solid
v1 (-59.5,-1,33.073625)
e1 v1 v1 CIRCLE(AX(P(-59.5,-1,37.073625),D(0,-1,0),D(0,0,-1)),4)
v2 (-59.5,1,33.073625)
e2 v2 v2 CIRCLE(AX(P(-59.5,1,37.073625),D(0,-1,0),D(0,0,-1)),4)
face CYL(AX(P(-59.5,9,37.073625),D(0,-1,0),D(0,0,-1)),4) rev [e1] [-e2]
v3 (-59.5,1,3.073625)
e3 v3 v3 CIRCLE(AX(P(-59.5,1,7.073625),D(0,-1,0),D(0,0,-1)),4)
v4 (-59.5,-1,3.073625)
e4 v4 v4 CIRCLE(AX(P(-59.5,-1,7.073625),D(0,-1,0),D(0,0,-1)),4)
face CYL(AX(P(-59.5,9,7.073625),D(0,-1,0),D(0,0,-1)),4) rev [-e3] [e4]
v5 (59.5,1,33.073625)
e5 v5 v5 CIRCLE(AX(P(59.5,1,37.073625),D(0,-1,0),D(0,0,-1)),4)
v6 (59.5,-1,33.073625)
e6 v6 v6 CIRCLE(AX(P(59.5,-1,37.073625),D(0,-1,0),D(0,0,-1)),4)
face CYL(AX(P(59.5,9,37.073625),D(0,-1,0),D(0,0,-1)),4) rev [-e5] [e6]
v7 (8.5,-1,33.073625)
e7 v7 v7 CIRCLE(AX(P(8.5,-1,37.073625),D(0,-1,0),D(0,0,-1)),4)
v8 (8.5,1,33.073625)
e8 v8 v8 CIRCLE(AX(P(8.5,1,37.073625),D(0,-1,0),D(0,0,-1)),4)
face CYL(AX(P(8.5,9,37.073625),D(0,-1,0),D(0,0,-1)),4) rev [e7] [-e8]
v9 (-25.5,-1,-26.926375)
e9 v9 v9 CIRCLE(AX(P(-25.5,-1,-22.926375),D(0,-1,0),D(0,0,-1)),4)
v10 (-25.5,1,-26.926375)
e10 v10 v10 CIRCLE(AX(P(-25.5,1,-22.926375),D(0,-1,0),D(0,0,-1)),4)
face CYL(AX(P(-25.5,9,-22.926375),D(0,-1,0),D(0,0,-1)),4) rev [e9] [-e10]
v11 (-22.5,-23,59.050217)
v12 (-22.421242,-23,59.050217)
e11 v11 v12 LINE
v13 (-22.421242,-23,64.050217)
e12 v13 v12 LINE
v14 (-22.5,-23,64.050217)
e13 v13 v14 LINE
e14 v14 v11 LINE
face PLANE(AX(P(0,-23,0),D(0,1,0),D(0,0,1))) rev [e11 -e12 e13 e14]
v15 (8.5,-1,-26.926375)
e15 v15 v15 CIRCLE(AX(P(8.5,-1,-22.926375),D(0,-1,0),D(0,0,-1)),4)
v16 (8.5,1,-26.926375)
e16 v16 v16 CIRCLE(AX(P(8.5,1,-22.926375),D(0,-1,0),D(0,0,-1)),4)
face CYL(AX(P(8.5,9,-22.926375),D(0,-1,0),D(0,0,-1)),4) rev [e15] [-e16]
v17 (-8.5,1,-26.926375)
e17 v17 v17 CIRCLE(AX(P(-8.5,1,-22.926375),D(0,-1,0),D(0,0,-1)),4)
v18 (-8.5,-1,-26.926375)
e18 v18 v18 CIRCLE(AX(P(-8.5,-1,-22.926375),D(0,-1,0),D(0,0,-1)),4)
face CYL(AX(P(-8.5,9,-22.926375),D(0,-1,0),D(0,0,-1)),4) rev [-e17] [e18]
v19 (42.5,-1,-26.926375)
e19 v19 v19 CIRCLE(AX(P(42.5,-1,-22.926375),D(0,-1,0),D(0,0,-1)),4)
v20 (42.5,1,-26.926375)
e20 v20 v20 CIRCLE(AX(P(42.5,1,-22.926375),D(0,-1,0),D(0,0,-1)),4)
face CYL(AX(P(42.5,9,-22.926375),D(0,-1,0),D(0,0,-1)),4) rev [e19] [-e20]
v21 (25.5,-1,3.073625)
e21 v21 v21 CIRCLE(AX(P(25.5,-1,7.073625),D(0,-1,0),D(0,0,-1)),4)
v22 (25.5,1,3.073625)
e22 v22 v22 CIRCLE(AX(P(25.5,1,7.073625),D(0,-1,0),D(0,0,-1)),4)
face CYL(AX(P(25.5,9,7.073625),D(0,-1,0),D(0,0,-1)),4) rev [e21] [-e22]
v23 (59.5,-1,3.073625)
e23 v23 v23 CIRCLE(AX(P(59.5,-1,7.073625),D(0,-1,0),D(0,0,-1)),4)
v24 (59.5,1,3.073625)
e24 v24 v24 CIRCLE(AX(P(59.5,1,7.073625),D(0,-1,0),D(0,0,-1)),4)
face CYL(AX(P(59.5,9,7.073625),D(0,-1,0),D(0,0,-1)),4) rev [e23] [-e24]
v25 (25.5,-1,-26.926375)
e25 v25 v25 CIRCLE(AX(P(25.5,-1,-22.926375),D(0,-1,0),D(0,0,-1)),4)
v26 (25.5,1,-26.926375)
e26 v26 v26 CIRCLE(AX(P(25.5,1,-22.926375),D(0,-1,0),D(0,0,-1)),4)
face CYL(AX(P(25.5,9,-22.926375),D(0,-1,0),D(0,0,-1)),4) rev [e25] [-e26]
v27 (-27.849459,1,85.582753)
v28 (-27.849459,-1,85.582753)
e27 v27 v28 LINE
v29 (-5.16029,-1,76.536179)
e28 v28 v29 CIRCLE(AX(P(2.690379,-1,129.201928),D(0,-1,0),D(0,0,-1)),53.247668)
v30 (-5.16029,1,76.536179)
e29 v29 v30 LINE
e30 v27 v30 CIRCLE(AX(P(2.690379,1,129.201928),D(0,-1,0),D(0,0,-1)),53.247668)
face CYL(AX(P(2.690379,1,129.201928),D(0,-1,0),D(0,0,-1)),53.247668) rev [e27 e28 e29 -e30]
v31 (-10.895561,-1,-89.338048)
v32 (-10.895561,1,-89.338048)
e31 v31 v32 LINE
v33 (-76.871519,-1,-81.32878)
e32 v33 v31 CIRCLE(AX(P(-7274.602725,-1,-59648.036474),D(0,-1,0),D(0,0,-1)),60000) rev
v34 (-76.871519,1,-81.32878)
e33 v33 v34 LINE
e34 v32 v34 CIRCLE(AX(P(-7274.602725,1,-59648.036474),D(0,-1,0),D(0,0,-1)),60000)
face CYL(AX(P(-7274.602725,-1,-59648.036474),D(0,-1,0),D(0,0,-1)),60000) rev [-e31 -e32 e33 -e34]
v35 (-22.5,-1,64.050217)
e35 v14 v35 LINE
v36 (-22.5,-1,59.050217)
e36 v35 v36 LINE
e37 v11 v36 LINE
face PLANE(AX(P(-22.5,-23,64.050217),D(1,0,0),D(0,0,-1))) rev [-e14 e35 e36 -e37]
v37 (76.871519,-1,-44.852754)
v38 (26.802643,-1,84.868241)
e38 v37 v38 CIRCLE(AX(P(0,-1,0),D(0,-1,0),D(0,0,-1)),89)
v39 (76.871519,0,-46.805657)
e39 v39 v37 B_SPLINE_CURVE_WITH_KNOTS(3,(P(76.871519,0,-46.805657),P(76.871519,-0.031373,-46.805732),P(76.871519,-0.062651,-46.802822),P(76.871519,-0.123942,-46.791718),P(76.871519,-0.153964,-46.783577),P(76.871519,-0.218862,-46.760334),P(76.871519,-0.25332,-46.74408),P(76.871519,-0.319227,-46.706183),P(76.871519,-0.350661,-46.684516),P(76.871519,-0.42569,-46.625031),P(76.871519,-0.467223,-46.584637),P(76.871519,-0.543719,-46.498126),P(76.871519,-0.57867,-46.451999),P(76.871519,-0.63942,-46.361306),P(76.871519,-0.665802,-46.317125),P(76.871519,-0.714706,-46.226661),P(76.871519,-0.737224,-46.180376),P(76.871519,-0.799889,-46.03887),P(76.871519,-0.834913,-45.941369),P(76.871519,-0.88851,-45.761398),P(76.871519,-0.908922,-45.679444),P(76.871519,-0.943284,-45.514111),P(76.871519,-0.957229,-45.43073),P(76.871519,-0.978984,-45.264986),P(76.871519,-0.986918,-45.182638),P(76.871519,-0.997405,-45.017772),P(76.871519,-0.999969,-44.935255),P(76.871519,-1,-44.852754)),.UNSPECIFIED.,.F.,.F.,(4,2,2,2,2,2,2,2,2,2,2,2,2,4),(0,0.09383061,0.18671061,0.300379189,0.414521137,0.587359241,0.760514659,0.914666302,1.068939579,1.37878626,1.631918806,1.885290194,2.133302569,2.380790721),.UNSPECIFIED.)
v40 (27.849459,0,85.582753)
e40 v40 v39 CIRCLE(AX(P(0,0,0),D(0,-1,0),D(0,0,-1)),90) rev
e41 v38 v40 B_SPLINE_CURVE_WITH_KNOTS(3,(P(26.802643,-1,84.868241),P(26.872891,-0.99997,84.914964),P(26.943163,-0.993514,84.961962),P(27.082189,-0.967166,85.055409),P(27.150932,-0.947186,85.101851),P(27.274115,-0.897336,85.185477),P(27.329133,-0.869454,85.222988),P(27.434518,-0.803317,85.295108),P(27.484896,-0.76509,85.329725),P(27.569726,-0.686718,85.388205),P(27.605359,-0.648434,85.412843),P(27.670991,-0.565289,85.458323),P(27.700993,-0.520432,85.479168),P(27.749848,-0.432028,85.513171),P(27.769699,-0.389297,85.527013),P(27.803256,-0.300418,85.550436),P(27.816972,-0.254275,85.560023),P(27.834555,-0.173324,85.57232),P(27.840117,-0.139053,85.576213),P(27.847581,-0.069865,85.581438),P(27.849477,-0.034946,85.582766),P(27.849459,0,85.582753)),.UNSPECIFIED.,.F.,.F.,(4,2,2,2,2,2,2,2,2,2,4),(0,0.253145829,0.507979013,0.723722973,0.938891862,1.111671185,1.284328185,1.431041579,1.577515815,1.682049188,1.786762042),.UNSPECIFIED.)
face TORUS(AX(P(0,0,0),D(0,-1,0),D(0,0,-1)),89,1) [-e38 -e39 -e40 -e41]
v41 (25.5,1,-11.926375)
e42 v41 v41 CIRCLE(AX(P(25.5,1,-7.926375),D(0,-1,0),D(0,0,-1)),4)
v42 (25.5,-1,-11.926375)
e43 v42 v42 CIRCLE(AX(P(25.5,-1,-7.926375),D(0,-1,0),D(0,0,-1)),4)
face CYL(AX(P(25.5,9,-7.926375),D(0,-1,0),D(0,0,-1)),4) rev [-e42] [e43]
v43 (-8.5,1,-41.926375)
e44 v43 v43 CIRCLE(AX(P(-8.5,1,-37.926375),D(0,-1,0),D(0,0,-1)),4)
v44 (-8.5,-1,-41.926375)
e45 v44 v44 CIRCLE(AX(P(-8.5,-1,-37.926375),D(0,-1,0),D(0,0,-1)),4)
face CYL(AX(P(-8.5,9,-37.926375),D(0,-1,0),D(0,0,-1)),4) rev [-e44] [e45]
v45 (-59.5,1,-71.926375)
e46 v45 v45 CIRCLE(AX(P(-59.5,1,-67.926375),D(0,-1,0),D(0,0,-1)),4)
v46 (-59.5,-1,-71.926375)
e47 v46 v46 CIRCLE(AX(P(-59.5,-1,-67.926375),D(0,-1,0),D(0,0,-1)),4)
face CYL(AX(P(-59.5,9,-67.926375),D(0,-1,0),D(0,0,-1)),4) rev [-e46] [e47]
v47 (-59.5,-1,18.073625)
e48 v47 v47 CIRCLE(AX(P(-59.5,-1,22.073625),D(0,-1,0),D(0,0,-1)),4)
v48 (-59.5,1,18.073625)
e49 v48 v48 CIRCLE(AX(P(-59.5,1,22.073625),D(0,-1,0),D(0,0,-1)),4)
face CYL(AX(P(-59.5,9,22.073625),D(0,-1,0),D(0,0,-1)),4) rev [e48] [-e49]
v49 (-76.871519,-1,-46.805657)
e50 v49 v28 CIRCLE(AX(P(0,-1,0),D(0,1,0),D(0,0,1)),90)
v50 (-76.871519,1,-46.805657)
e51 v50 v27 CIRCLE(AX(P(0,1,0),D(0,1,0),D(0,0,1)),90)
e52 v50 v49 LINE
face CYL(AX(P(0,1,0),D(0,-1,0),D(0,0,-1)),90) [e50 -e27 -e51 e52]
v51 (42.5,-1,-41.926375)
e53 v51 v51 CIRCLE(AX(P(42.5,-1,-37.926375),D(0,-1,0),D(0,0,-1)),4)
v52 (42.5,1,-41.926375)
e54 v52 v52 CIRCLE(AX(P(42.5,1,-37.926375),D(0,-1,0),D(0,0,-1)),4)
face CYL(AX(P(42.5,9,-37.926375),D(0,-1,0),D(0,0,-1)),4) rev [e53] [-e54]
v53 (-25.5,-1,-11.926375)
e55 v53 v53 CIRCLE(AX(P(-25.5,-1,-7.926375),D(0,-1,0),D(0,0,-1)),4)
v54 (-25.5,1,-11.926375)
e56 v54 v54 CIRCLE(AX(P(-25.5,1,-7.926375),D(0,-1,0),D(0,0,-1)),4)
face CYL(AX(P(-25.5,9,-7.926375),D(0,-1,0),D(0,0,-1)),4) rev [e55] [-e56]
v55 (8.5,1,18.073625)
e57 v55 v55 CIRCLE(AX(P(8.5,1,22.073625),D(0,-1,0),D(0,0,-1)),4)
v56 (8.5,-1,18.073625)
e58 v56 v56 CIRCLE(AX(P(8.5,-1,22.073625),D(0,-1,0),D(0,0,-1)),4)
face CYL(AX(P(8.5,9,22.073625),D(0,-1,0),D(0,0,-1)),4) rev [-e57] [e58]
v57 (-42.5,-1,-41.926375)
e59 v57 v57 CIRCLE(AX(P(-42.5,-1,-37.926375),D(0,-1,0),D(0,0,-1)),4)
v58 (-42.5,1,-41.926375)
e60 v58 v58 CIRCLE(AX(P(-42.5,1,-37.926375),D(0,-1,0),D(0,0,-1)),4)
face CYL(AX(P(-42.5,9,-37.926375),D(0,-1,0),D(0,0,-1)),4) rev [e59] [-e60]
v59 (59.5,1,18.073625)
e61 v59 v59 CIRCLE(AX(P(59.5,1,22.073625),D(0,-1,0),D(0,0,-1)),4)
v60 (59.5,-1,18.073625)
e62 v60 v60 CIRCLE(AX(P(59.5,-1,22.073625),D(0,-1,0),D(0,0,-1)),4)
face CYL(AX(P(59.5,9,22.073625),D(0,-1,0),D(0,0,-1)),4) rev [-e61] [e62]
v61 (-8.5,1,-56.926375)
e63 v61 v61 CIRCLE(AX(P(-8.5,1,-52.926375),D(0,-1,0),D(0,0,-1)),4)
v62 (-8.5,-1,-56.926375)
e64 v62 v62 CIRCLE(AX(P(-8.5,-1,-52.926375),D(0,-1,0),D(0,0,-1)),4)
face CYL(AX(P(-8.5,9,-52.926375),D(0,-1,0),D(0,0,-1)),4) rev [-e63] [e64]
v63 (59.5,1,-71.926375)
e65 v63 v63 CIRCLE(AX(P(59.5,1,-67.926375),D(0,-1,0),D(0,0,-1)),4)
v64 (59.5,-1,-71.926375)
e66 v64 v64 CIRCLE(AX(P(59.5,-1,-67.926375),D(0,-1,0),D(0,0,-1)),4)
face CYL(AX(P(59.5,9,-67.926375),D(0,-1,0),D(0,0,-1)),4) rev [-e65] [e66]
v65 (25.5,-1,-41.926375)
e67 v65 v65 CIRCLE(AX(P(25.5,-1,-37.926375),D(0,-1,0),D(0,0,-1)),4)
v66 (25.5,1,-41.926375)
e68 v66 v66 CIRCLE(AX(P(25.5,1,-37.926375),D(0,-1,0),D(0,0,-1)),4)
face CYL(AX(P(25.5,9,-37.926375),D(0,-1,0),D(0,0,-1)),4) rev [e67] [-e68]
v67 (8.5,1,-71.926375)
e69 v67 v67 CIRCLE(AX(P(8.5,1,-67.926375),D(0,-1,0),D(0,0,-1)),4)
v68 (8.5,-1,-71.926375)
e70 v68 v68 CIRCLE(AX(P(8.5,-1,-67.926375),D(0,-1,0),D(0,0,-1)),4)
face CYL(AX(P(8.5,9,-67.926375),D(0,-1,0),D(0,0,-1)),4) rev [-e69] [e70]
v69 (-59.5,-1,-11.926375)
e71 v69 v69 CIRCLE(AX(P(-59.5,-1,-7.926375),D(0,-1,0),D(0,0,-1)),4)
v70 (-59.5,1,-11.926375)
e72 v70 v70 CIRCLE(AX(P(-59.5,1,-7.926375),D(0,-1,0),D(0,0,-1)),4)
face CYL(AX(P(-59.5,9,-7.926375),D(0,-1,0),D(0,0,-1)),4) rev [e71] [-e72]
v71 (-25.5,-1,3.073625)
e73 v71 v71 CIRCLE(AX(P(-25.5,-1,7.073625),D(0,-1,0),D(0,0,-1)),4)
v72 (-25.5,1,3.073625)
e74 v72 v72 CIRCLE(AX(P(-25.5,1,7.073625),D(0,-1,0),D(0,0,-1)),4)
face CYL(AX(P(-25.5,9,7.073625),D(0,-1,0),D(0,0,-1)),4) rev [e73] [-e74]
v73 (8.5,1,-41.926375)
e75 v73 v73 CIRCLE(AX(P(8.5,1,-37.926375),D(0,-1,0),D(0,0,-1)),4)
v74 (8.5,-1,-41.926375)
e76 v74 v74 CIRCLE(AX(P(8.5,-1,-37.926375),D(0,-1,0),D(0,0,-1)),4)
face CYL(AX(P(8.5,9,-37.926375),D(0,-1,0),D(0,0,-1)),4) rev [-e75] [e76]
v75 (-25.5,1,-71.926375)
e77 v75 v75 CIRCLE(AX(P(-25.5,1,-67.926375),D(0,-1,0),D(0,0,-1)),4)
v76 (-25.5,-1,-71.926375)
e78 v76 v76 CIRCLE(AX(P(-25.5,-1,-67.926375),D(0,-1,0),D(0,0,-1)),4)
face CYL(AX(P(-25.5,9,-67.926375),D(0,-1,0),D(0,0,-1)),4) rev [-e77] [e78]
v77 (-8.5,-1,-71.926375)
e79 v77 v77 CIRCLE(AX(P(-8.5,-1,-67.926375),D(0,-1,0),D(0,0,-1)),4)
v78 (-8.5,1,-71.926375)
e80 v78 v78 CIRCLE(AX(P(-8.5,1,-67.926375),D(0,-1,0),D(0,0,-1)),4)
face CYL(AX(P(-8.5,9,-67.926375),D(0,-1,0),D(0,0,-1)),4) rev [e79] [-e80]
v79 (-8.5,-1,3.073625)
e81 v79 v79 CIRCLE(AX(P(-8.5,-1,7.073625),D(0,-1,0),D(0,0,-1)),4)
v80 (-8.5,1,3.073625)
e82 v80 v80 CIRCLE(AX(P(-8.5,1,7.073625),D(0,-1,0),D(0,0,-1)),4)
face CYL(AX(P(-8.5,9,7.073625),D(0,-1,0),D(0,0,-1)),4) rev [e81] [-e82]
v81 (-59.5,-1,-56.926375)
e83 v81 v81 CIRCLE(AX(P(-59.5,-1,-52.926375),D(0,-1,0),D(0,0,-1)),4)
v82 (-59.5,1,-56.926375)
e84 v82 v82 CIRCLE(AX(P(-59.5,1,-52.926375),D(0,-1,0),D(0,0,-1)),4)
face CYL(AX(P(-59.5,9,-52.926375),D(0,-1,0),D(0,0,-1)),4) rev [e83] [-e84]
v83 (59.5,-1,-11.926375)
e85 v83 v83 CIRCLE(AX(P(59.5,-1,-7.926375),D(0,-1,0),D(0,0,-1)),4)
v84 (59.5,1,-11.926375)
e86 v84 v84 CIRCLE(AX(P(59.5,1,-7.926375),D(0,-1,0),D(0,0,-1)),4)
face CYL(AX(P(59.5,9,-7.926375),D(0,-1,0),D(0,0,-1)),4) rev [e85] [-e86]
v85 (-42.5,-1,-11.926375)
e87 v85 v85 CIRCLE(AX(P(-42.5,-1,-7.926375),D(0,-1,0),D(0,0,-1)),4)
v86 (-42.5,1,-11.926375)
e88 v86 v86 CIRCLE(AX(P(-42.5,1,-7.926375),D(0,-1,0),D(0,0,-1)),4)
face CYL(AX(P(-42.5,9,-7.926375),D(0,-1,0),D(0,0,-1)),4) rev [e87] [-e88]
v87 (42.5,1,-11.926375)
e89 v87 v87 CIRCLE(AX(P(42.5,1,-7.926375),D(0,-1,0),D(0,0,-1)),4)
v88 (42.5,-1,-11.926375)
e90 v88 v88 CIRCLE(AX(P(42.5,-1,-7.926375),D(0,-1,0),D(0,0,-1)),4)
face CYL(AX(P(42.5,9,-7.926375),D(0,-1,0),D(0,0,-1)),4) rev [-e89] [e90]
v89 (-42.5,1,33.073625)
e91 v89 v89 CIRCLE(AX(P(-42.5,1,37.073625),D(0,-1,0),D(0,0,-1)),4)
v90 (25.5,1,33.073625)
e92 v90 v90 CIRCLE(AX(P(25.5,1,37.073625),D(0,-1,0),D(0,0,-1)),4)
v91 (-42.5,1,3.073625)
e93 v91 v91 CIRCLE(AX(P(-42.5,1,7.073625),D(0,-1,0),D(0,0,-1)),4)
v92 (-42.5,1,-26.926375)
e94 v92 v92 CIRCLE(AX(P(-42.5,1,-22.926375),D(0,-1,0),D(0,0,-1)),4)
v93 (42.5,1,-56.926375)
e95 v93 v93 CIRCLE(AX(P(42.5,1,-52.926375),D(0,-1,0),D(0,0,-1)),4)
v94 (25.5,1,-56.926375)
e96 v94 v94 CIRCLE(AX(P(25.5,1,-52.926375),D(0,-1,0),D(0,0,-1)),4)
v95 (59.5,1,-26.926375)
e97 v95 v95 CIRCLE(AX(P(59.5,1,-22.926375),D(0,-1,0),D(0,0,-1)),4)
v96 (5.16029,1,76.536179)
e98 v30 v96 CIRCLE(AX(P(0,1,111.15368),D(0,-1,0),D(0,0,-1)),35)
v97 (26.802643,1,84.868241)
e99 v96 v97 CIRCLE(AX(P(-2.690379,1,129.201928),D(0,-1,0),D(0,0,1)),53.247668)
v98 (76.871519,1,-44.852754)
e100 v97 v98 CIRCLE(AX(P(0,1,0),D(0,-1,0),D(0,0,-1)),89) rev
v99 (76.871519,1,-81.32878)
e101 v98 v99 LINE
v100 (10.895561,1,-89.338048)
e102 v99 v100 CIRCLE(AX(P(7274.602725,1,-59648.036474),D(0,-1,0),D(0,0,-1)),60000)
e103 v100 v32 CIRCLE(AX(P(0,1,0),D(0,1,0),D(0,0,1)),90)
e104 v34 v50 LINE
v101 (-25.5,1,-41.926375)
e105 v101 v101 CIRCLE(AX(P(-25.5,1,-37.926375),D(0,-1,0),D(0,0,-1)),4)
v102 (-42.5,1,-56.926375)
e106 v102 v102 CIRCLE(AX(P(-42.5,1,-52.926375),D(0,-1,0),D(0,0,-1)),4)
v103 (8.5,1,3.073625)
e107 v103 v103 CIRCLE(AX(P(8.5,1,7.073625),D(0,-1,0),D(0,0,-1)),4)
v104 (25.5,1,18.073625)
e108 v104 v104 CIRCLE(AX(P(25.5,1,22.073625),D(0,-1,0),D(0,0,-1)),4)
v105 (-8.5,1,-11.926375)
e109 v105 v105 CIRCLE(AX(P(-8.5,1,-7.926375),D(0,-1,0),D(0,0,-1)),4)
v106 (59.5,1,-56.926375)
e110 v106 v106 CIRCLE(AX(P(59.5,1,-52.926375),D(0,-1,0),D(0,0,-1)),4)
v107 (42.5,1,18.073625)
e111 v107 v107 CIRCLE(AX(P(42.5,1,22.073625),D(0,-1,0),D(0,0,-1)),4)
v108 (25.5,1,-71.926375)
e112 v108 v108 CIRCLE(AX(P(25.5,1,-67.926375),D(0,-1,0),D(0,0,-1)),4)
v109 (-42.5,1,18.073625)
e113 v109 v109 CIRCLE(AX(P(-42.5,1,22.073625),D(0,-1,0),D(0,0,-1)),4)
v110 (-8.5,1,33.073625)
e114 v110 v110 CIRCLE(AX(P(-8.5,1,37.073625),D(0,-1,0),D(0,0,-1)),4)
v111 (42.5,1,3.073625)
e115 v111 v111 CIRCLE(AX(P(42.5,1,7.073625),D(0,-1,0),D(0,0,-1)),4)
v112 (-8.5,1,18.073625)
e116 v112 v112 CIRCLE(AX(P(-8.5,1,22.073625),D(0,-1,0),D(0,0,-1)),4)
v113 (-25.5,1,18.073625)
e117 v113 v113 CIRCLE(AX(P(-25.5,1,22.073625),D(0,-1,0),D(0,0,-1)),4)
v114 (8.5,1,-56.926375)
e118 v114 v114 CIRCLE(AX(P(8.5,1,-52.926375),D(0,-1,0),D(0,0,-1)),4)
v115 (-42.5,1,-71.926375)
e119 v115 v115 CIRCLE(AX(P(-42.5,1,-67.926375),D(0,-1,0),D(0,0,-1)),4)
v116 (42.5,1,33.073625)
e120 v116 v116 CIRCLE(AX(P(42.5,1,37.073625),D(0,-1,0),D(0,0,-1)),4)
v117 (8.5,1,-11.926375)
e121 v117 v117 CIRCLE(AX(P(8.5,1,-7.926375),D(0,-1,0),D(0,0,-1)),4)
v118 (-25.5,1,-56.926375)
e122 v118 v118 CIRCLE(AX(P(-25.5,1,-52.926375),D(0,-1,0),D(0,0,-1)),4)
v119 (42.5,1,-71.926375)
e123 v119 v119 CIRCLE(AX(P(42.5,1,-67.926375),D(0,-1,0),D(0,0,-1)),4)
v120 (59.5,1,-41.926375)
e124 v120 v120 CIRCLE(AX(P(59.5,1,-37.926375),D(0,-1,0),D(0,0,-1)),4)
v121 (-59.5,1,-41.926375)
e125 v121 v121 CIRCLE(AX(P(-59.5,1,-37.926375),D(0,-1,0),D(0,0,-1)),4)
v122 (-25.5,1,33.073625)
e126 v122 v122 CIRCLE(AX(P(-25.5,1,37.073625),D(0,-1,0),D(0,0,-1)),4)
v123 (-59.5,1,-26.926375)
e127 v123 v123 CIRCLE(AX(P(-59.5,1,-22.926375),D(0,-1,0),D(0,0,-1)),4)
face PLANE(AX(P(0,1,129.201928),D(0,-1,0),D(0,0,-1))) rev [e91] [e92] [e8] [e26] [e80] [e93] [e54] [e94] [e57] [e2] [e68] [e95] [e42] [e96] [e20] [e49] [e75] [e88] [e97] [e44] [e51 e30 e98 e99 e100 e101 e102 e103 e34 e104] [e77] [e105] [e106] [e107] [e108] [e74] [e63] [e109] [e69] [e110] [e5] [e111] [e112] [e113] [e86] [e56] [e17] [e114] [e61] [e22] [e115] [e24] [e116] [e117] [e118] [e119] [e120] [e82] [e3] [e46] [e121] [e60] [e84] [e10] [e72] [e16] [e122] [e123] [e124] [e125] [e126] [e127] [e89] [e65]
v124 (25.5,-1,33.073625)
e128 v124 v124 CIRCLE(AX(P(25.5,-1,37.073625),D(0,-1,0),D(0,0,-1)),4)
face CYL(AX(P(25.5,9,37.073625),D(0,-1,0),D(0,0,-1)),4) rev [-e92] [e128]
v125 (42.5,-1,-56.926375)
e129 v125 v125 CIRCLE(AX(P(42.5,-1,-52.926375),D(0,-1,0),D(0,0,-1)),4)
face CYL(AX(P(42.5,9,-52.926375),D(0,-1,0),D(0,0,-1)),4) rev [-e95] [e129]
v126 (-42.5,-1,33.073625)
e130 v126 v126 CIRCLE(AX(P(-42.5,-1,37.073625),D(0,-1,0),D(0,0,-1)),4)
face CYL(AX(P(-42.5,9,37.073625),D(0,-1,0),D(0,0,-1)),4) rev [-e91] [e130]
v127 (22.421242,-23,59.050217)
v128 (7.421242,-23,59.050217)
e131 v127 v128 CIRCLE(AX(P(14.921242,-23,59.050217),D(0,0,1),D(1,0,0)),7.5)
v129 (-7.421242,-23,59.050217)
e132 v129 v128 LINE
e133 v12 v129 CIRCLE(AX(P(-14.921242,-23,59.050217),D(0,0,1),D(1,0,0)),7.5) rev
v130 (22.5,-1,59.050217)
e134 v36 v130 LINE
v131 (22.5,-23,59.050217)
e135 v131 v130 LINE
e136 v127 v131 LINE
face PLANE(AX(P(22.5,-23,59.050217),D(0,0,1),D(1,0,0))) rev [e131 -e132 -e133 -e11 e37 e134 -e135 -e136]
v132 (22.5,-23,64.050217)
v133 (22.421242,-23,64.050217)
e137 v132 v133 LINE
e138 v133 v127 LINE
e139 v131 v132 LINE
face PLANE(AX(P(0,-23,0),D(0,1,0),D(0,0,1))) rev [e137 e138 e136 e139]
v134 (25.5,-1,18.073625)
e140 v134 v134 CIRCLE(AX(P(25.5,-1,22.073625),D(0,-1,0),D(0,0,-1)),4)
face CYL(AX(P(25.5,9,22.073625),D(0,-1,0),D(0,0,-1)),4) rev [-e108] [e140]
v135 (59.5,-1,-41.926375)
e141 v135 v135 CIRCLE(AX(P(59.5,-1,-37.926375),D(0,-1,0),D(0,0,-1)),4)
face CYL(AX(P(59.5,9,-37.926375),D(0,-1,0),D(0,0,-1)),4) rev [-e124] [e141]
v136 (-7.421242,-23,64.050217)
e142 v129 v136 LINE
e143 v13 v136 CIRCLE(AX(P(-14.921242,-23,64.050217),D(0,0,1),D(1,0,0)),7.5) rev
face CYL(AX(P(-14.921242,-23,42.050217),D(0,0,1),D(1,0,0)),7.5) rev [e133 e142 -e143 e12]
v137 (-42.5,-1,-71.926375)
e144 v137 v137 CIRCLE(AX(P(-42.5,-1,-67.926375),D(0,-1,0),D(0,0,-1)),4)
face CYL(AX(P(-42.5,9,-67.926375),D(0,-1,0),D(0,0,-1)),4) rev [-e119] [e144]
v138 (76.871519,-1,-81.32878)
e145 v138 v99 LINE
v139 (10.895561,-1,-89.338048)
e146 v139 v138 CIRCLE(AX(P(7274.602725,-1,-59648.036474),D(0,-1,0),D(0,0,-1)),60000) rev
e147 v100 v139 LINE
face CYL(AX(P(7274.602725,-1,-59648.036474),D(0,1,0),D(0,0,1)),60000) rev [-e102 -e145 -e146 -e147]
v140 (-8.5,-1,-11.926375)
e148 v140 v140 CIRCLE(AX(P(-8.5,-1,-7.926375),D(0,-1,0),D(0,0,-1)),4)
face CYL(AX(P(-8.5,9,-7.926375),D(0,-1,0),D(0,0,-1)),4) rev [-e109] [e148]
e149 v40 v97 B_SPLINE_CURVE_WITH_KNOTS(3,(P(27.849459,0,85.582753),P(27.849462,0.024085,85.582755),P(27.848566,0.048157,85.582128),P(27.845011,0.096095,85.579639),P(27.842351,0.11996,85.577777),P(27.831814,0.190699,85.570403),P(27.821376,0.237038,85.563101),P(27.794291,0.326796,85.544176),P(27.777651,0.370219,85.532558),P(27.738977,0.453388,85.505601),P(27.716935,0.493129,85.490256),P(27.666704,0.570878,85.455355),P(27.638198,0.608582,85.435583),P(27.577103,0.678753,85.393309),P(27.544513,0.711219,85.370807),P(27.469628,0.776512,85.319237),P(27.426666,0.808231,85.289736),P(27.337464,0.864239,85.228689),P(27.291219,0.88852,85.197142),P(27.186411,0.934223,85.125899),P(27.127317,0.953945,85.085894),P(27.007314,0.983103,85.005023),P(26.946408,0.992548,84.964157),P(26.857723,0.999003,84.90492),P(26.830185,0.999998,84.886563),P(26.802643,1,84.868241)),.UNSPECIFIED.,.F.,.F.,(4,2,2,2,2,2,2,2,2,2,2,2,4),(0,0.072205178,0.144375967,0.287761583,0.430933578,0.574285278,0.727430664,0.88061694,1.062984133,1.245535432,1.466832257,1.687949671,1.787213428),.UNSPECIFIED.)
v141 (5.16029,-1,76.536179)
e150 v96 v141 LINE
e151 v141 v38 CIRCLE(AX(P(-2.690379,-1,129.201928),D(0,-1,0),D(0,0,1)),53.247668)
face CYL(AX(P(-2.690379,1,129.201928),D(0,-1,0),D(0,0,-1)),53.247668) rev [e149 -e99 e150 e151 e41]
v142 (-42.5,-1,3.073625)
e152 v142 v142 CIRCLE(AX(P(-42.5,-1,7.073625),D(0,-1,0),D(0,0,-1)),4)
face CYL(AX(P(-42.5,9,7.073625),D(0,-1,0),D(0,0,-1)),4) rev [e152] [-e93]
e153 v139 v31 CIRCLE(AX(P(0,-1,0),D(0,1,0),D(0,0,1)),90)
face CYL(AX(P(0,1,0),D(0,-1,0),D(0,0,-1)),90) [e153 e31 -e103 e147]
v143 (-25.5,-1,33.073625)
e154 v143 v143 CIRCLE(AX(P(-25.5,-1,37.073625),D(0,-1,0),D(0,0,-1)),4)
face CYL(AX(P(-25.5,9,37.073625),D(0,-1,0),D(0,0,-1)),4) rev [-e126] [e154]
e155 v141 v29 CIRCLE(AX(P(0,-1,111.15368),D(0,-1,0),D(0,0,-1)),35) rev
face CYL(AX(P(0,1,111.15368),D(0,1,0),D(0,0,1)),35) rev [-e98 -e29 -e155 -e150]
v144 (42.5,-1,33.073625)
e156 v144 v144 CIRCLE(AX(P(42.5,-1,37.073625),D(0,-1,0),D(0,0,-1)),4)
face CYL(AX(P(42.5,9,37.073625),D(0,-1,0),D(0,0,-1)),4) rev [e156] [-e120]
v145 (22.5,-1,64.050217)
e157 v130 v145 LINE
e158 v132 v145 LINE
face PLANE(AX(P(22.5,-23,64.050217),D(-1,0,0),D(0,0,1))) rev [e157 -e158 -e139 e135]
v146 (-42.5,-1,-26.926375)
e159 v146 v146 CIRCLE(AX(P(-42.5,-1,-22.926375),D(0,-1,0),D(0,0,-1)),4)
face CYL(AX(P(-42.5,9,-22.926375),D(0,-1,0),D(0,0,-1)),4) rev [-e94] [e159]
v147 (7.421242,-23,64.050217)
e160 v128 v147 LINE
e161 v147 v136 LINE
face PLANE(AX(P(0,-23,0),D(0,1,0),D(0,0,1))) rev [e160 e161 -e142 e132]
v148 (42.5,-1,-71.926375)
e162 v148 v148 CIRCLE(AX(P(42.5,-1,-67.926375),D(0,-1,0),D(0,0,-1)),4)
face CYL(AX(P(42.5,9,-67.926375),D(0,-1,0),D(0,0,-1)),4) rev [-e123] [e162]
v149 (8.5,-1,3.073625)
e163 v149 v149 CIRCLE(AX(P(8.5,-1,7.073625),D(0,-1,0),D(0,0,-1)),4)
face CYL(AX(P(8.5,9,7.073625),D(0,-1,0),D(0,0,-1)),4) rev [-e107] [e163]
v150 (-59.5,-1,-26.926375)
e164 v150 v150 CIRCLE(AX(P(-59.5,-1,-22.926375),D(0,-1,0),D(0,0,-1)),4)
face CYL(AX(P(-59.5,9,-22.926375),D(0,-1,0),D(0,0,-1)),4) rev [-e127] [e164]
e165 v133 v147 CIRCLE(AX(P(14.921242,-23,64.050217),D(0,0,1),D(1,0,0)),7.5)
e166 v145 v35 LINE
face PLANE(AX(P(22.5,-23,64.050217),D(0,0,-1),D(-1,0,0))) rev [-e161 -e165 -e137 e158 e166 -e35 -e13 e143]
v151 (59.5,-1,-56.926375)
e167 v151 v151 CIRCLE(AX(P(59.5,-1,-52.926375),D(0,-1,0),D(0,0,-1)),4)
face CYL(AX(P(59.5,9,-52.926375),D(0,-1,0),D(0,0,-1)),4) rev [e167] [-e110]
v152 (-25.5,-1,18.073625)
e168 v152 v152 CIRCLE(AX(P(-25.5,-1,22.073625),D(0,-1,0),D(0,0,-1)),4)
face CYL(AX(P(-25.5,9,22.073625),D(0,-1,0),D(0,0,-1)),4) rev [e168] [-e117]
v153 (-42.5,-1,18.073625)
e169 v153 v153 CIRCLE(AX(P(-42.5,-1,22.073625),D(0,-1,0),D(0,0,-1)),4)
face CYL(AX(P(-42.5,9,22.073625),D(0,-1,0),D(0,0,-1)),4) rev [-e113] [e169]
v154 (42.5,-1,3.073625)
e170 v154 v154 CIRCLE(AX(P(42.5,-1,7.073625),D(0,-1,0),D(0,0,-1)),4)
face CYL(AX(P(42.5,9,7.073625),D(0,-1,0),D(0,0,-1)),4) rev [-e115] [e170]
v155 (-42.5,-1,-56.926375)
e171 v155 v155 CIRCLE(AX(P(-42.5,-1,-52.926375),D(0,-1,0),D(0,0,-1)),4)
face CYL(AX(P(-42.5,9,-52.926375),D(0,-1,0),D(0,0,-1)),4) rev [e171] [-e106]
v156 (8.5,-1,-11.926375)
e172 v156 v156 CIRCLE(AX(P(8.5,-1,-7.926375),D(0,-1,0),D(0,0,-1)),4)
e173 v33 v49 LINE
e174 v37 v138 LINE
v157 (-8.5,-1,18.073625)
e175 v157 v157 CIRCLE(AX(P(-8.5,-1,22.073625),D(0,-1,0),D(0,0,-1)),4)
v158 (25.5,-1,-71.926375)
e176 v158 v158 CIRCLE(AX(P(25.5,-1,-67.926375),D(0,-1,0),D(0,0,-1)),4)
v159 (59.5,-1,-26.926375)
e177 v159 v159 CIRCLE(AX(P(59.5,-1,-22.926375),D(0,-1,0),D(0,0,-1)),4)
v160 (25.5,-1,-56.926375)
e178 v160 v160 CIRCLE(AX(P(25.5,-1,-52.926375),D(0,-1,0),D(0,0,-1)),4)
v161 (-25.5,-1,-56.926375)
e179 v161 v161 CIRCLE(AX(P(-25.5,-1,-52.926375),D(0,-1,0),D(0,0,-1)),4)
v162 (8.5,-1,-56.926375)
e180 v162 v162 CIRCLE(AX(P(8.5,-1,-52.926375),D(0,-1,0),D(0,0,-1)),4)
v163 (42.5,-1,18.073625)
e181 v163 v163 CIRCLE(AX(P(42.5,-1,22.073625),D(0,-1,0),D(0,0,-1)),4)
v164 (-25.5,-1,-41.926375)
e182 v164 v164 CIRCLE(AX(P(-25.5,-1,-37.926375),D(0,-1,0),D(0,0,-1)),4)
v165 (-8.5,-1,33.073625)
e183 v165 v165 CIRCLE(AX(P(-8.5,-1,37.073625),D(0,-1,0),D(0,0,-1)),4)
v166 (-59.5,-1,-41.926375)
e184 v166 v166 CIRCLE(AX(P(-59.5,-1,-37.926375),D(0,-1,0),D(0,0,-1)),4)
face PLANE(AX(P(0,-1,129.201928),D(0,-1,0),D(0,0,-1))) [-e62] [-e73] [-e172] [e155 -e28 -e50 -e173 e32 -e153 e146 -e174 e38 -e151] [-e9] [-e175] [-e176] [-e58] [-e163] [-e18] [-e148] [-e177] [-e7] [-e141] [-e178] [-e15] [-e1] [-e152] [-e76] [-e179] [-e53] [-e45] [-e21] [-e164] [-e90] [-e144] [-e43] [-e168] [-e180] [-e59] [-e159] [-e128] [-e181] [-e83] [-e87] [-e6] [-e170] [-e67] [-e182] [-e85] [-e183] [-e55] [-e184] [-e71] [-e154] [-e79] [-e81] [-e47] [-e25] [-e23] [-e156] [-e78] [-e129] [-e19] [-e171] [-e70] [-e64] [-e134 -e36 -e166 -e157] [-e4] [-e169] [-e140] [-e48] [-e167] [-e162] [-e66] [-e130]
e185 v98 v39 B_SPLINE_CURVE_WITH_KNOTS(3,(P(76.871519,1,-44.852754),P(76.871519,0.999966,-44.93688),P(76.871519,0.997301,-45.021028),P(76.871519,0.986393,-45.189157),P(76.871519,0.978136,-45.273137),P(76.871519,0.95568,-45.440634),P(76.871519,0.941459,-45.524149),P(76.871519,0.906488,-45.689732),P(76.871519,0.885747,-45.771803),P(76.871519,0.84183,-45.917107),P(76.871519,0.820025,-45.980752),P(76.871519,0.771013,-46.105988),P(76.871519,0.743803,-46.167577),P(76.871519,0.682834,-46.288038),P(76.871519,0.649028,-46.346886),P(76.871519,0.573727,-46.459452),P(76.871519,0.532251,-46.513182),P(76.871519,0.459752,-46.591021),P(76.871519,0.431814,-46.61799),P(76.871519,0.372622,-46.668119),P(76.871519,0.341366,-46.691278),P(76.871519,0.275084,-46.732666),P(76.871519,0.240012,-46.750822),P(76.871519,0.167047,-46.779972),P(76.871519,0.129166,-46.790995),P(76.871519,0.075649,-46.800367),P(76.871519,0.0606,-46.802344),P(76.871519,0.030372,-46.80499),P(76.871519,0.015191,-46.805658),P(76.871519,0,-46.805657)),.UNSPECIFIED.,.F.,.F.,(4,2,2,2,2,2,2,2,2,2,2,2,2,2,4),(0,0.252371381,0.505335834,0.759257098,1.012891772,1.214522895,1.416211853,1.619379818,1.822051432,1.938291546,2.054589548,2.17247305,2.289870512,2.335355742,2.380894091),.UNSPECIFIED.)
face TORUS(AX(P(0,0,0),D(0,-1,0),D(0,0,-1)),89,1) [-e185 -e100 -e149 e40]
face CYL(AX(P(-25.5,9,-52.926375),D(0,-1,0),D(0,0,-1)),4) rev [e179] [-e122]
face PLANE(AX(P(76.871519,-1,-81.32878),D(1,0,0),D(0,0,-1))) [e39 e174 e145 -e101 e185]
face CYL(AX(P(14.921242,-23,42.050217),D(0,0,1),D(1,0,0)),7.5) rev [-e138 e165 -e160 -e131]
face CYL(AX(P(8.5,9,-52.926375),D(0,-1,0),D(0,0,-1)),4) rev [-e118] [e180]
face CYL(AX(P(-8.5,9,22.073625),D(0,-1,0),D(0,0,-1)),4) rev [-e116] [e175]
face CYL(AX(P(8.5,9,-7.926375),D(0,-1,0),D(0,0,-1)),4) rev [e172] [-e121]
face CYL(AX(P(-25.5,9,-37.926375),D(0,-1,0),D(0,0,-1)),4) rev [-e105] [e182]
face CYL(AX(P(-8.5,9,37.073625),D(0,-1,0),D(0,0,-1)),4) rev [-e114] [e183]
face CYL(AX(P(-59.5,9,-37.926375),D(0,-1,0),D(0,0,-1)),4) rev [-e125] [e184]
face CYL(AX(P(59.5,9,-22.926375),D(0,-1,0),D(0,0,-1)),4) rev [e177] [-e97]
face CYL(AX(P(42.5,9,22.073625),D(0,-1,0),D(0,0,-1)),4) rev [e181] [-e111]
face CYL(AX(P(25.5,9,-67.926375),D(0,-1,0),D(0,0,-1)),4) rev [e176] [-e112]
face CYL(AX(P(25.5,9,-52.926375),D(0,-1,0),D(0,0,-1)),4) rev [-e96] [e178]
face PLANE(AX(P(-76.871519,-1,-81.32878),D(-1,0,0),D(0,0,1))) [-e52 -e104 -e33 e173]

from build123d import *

# Parameters (mm, degrees)
BOSS_EXTRUDE2_DEPTH  = 1
MOTOR_SPACING_W      = 153.743038476
MOTOR_SPACING_H      = 35
BOSS_EXTRUDE6_DEPTH  = 2
FILLET4_START        = -1
FILLET4_DEPTH        = 2
FILLET6_R            = 35
FILLET7_R            = 1
PIR_ULTRA_W          = 45
PIR_ULTRA_H          = 5
BOSS_EXTRUDE10_DEPTH = 22
CUT_EXTRUDE4_DEPTH   = 22
SKETCH4_R            = 4
CUT_EXTRUDE5_DEPTH   = 10


with BuildPart() as part:
    # Top_lay → Boss-Extrude2 (new, symmetric)
    with BuildSketch(Plane(origin=(0, 0, 0), x_dir=(1, 0, 0), z_dir=(0, 1, 0))):
        with BuildLine():
            ThreePointArc((27.849459475, -85.582752976), (0, 90), (-27.849459475, -85.582752976))
            ThreePointArc((-27.849459475, -85.582752976), (-14.598708504, -78.839227398), (0, -76.022270085))
            ThreePointArc((0, -76.022270085), (14.598708504, -78.839227398), (27.849459475, -85.582752976))
        make_face()
    extrude(amount=BOSS_EXTRUDE2_DEPTH, both=True)

    # Motor_Spacing → Boss-Extrude6 (add)
    with BuildSketch(Plane(origin=(0, 1, 0), x_dir=(1, 0, 0), z_dir=(0, 1, 0))):
        with Locations((0, 63.828780022)):
            Rectangle(MOTOR_SPACING_W, MOTOR_SPACING_H)
    extrude(amount=-BOSS_EXTRUDE6_DEPTH)

    # Fillet4: read off the stored shape, not the designer's step
    # Fillet4 outline → Fillet4 (add)
    with BuildSketch(Plane(origin=(0, 0, 0), x_dir=(1, 0, 0), z_dir=(0, 1, 0)).offset(FILLET4_START)):
        with BuildLine():
            ThreePointArc((-38.543865143, 81.328780022), (-25.041990736, 86.445929343), (-10.895560747, 89.338047639))
            ThreePointArc((-10.895560747, 89.338047639), (-43.882431037, 85.324278863), (-76.871519238, 81.328780022))
            Line((-76.871519238, 81.328780022), (-38.543865143, 81.328780022))
        make_face()
        with BuildLine():
            ThreePointArc((76.871519238, 81.328780022), (43.882431037, 85.324278863), (10.895560747, 89.338047639))
            ThreePointArc((10.895560747, 89.338047639), (25.041990736, 86.445929343), (38.543865143, 81.328780022))
            Line((38.543865143, 81.328780022), (76.871519238, 81.328780022))
        make_face()
    extrude(amount=FILLET4_DEPTH)

    # Fillet6
    fillet6_edges = [part.edges().sort_by_distance(p)[0] for p in [
        (0, 0, 76.022270085),
    ]]
    fillet(fillet6_edges, radius=FILLET6_R)

    # Fillet7
    fillet7_edges = [part.edges().sort_by_distance(p)[0] for p in [
        (84.399606762, 1, 31.252301969),
        (84.399606762, -1, 31.252301969),
    ]]
    fillet(fillet7_edges, radius=FILLET7_R - 0.0001)  # a hair under: the kernel refuses the full size

    # PIR_ULTRA → Boss-Extrude10 (add)
    with BuildSketch(Plane.XZ.offset(1)):
        with Locations((0, 61.550217006)):
            Rectangle(PIR_ULTRA_W, PIR_ULTRA_H)
    extrude(amount=BOSS_EXTRUDE10_DEPTH)

    # Sketch3 → Cut-Extrude4 (cut)
    with BuildSketch(Plane.XY.offset(64.050217006)):
        with BuildLine():
            Line((-7.578758104, -23), (-7.421241896, -23))
            ThreePointArc((-7.421241896, -23), (-14.921241896, -15.5), (-22.421241896, -23))
            Line((-22.421241896, -23), (-7.578758104, -23))
        make_face()
        with BuildLine():
            ThreePointArc((22.421241896, -23), (14.921241896, -15.5), (7.421241896, -23))
            Line((7.421241896, -23), (22.421241896, -23))
        make_face()
    extrude(amount=-CUT_EXTRUDE4_DEPTH, mode=Mode.SUBTRACT)

    # Sketch4 → Cut-Extrude5 (cut)
    with BuildSketch(Plane.XZ.offset(1)):
        with Locations(Location((-59.5, -67.926375212, 0), (0, 0, 270))):
            Circle(SKETCH4_R)
        with Locations(Location((-25.5, -67.926375212, 0), (0, 0, 270))):
            Circle(SKETCH4_R)
        with Locations(Location((-42.5, -67.926375212, 0), (0, 0, 270))):
            Circle(SKETCH4_R)
        with Locations(Location((-8.5, -67.926375212, 0), (0, 0, 270))):
            Circle(SKETCH4_R)
        with Locations(Location((8.5, -67.926375212, 0), (0, 0, 270))):
            Circle(SKETCH4_R)
        with Locations(Location((25.5, -67.926375212, 0), (0, 0, 270))):
            Circle(SKETCH4_R)
        with Locations(Location((42.5, -67.926375212, 0), (0, 0, 270))):
            Circle(SKETCH4_R)
        with Locations(Location((59.5, -67.926375212, 0), (0, 0, 270))):
            Circle(SKETCH4_R)
        with Locations(Location((-59.5, -52.926375212, 0), (0, 0, 270))):
            Circle(SKETCH4_R)
        with Locations(Location((25.5, -52.926375212, 0), (0, 0, 270))):
            Circle(SKETCH4_R)
        with Locations(Location((-42.5, -52.926375212, 0), (0, 0, 270))):
            Circle(SKETCH4_R)
        with Locations(Location((-25.5, -52.926375212, 0), (0, 0, 270))):
            Circle(SKETCH4_R)
        with Locations(Location((8.5, -52.926375212, 0), (0, 0, 270))):
            Circle(SKETCH4_R)
        with Locations(Location((42.5, -52.926375212, 0), (0, 0, 270))):
            Circle(SKETCH4_R)
        with Locations(Location((59.5, -52.926375212, 0), (0, 0, 270))):
            Circle(SKETCH4_R)
        with Locations(Location((-8.5, -52.926375212, 0), (0, 0, 270))):
            Circle(SKETCH4_R)
        with Locations(Location((-59.5, -37.926375212, 0), (0, 0, 270))):
            Circle(SKETCH4_R)
        with Locations(Location((25.5, -37.926375212, 0), (0, 0, 270))):
            Circle(SKETCH4_R)
        with Locations(Location((-42.5, -37.926375212, 0), (0, 0, 270))):
            Circle(SKETCH4_R)
        with Locations(Location((-25.5, -37.926375212, 0), (0, 0, 270))):
            Circle(SKETCH4_R)
        with Locations(Location((8.5, -37.926375212, 0), (0, 0, 270))):
            Circle(SKETCH4_R)
        with Locations(Location((42.5, -37.926375212, 0), (0, 0, 270))):
            Circle(SKETCH4_R)
        with Locations(Location((59.5, -37.926375212, 0), (0, 0, 270))):
            Circle(SKETCH4_R)
        with Locations(Location((-8.5, -37.926375212, 0), (0, 0, 270))):
            Circle(SKETCH4_R)
        with Locations(Location((-59.5, -22.926375212, 0), (0, 0, 270))):
            Circle(SKETCH4_R)
        with Locations(Location((25.5, -22.926375212, 0), (0, 0, 270))):
            Circle(SKETCH4_R)
        with Locations(Location((-42.5, -22.926375212, 0), (0, 0, 270))):
            Circle(SKETCH4_R)
        with Locations(Location((-25.5, -22.926375212, 0), (0, 0, 270))):
            Circle(SKETCH4_R)
        with Locations(Location((8.5, -22.926375212, 0), (0, 0, 270))):
            Circle(SKETCH4_R)
        with Locations(Location((42.5, -22.926375212, 0), (0, 0, 270))):
            Circle(SKETCH4_R)
        with Locations(Location((59.5, -22.926375212, 0), (0, 0, 270))):
            Circle(SKETCH4_R)
        with Locations(Location((-8.5, -22.926375212, 0), (0, 0, 270))):
            Circle(SKETCH4_R)
        with Locations(Location((-59.5, -7.926375212, 0), (0, 0, 270))):
            Circle(SKETCH4_R)
        with Locations(Location((25.5, -7.926375212, 0), (0, 0, 270))):
            Circle(SKETCH4_R)
        with Locations(Location((-42.5, -7.926375212, 0), (0, 0, 270))):
            Circle(SKETCH4_R)
        with Locations(Location((-25.5, -7.926375212, 0), (0, 0, 270))):
            Circle(SKETCH4_R)
        with Locations(Location((8.5, -7.926375212, 0), (0, 0, 270))):
            Circle(SKETCH4_R)
        with Locations(Location((42.5, -7.926375212, 0), (0, 0, 270))):
            Circle(SKETCH4_R)
        with Locations(Location((59.5, -7.926375212, 0), (0, 0, 270))):
            Circle(SKETCH4_R)
        with Locations(Location((-8.5, -7.926375212, 0), (0, 0, 270))):
            Circle(SKETCH4_R)
        with Locations(Location((-59.5, 7.073624788, 0), (0, 0, 270))):
            Circle(SKETCH4_R)
        with Locations(Location((25.5, 7.073624788, 0), (0, 0, 270))):
            Circle(SKETCH4_R)
        with Locations(Location((-42.5, 7.073624788, 0), (0, 0, 270))):
            Circle(SKETCH4_R)
        with Locations(Location((-25.5, 7.073624788, 0), (0, 0, 270))):
            Circle(SKETCH4_R)
        with Locations(Location((8.5, 7.073624788, 0), (0, 0, 270))):
            Circle(SKETCH4_R)
        with Locations(Location((42.5, 7.073624788, 0), (0, 0, 270))):
            Circle(SKETCH4_R)
        with Locations(Location((59.5, 7.073624788, 0), (0, 0, 270))):
            Circle(SKETCH4_R)
        with Locations(Location((-8.5, 7.073624788, 0), (0, 0, 270))):
            Circle(SKETCH4_R)
        with Locations(Location((-59.5, 22.073624788, 0), (0, 0, 270))):
            Circle(SKETCH4_R)
        with Locations(Location((25.5, 22.073624788, 0), (0, 0, 270))):
            Circle(SKETCH4_R)
        with Locations(Location((-42.5, 22.073624788, 0), (0, 0, 270))):
            Circle(SKETCH4_R)
        with Locations(Location((-25.5, 22.073624788, 0), (0, 0, 270))):
            Circle(SKETCH4_R)
        with Locations(Location((8.5, 22.073624788, 0), (0, 0, 270))):
            Circle(SKETCH4_R)
        with Locations(Location((42.5, 22.073624788, 0), (0, 0, 270))):
            Circle(SKETCH4_R)
        with Locations(Location((59.5, 22.073624788, 0), (0, 0, 270))):
            Circle(SKETCH4_R)
        with Locations(Location((-8.5, 22.073624788, 0), (0, 0, 270))):
            Circle(SKETCH4_R)
        with Locations(Location((-59.5, 37.073624788, 0), (0, 0, 270))):
            Circle(SKETCH4_R)
        with Locations(Location((25.5, 37.073624788, 0), (0, 0, 270))):
            Circle(SKETCH4_R)
        with Locations(Location((-42.5, 37.073624788, 0), (0, 0, 270))):
            Circle(SKETCH4_R)
        with Locations(Location((-25.5, 37.073624788, 0), (0, 0, 270))):
            Circle(SKETCH4_R)
        with Locations(Location((8.5, 37.073624788, 0), (0, 0, 270))):
            Circle(SKETCH4_R)
        with Locations(Location((42.5, 37.073624788, 0), (0, 0, 270))):
            Circle(SKETCH4_R)
        with Locations(Location((59.5, 37.073624788, 0), (0, 0, 270))):
            Circle(SKETCH4_R)
        with Locations(Location((-8.5, 37.073624788, 0), (0, 0, 270))):
            Circle(SKETCH4_R)
    extrude(amount=-CUT_EXTRUDE5_DEPTH, mode=Mode.SUBTRACT)


solid = part.part
